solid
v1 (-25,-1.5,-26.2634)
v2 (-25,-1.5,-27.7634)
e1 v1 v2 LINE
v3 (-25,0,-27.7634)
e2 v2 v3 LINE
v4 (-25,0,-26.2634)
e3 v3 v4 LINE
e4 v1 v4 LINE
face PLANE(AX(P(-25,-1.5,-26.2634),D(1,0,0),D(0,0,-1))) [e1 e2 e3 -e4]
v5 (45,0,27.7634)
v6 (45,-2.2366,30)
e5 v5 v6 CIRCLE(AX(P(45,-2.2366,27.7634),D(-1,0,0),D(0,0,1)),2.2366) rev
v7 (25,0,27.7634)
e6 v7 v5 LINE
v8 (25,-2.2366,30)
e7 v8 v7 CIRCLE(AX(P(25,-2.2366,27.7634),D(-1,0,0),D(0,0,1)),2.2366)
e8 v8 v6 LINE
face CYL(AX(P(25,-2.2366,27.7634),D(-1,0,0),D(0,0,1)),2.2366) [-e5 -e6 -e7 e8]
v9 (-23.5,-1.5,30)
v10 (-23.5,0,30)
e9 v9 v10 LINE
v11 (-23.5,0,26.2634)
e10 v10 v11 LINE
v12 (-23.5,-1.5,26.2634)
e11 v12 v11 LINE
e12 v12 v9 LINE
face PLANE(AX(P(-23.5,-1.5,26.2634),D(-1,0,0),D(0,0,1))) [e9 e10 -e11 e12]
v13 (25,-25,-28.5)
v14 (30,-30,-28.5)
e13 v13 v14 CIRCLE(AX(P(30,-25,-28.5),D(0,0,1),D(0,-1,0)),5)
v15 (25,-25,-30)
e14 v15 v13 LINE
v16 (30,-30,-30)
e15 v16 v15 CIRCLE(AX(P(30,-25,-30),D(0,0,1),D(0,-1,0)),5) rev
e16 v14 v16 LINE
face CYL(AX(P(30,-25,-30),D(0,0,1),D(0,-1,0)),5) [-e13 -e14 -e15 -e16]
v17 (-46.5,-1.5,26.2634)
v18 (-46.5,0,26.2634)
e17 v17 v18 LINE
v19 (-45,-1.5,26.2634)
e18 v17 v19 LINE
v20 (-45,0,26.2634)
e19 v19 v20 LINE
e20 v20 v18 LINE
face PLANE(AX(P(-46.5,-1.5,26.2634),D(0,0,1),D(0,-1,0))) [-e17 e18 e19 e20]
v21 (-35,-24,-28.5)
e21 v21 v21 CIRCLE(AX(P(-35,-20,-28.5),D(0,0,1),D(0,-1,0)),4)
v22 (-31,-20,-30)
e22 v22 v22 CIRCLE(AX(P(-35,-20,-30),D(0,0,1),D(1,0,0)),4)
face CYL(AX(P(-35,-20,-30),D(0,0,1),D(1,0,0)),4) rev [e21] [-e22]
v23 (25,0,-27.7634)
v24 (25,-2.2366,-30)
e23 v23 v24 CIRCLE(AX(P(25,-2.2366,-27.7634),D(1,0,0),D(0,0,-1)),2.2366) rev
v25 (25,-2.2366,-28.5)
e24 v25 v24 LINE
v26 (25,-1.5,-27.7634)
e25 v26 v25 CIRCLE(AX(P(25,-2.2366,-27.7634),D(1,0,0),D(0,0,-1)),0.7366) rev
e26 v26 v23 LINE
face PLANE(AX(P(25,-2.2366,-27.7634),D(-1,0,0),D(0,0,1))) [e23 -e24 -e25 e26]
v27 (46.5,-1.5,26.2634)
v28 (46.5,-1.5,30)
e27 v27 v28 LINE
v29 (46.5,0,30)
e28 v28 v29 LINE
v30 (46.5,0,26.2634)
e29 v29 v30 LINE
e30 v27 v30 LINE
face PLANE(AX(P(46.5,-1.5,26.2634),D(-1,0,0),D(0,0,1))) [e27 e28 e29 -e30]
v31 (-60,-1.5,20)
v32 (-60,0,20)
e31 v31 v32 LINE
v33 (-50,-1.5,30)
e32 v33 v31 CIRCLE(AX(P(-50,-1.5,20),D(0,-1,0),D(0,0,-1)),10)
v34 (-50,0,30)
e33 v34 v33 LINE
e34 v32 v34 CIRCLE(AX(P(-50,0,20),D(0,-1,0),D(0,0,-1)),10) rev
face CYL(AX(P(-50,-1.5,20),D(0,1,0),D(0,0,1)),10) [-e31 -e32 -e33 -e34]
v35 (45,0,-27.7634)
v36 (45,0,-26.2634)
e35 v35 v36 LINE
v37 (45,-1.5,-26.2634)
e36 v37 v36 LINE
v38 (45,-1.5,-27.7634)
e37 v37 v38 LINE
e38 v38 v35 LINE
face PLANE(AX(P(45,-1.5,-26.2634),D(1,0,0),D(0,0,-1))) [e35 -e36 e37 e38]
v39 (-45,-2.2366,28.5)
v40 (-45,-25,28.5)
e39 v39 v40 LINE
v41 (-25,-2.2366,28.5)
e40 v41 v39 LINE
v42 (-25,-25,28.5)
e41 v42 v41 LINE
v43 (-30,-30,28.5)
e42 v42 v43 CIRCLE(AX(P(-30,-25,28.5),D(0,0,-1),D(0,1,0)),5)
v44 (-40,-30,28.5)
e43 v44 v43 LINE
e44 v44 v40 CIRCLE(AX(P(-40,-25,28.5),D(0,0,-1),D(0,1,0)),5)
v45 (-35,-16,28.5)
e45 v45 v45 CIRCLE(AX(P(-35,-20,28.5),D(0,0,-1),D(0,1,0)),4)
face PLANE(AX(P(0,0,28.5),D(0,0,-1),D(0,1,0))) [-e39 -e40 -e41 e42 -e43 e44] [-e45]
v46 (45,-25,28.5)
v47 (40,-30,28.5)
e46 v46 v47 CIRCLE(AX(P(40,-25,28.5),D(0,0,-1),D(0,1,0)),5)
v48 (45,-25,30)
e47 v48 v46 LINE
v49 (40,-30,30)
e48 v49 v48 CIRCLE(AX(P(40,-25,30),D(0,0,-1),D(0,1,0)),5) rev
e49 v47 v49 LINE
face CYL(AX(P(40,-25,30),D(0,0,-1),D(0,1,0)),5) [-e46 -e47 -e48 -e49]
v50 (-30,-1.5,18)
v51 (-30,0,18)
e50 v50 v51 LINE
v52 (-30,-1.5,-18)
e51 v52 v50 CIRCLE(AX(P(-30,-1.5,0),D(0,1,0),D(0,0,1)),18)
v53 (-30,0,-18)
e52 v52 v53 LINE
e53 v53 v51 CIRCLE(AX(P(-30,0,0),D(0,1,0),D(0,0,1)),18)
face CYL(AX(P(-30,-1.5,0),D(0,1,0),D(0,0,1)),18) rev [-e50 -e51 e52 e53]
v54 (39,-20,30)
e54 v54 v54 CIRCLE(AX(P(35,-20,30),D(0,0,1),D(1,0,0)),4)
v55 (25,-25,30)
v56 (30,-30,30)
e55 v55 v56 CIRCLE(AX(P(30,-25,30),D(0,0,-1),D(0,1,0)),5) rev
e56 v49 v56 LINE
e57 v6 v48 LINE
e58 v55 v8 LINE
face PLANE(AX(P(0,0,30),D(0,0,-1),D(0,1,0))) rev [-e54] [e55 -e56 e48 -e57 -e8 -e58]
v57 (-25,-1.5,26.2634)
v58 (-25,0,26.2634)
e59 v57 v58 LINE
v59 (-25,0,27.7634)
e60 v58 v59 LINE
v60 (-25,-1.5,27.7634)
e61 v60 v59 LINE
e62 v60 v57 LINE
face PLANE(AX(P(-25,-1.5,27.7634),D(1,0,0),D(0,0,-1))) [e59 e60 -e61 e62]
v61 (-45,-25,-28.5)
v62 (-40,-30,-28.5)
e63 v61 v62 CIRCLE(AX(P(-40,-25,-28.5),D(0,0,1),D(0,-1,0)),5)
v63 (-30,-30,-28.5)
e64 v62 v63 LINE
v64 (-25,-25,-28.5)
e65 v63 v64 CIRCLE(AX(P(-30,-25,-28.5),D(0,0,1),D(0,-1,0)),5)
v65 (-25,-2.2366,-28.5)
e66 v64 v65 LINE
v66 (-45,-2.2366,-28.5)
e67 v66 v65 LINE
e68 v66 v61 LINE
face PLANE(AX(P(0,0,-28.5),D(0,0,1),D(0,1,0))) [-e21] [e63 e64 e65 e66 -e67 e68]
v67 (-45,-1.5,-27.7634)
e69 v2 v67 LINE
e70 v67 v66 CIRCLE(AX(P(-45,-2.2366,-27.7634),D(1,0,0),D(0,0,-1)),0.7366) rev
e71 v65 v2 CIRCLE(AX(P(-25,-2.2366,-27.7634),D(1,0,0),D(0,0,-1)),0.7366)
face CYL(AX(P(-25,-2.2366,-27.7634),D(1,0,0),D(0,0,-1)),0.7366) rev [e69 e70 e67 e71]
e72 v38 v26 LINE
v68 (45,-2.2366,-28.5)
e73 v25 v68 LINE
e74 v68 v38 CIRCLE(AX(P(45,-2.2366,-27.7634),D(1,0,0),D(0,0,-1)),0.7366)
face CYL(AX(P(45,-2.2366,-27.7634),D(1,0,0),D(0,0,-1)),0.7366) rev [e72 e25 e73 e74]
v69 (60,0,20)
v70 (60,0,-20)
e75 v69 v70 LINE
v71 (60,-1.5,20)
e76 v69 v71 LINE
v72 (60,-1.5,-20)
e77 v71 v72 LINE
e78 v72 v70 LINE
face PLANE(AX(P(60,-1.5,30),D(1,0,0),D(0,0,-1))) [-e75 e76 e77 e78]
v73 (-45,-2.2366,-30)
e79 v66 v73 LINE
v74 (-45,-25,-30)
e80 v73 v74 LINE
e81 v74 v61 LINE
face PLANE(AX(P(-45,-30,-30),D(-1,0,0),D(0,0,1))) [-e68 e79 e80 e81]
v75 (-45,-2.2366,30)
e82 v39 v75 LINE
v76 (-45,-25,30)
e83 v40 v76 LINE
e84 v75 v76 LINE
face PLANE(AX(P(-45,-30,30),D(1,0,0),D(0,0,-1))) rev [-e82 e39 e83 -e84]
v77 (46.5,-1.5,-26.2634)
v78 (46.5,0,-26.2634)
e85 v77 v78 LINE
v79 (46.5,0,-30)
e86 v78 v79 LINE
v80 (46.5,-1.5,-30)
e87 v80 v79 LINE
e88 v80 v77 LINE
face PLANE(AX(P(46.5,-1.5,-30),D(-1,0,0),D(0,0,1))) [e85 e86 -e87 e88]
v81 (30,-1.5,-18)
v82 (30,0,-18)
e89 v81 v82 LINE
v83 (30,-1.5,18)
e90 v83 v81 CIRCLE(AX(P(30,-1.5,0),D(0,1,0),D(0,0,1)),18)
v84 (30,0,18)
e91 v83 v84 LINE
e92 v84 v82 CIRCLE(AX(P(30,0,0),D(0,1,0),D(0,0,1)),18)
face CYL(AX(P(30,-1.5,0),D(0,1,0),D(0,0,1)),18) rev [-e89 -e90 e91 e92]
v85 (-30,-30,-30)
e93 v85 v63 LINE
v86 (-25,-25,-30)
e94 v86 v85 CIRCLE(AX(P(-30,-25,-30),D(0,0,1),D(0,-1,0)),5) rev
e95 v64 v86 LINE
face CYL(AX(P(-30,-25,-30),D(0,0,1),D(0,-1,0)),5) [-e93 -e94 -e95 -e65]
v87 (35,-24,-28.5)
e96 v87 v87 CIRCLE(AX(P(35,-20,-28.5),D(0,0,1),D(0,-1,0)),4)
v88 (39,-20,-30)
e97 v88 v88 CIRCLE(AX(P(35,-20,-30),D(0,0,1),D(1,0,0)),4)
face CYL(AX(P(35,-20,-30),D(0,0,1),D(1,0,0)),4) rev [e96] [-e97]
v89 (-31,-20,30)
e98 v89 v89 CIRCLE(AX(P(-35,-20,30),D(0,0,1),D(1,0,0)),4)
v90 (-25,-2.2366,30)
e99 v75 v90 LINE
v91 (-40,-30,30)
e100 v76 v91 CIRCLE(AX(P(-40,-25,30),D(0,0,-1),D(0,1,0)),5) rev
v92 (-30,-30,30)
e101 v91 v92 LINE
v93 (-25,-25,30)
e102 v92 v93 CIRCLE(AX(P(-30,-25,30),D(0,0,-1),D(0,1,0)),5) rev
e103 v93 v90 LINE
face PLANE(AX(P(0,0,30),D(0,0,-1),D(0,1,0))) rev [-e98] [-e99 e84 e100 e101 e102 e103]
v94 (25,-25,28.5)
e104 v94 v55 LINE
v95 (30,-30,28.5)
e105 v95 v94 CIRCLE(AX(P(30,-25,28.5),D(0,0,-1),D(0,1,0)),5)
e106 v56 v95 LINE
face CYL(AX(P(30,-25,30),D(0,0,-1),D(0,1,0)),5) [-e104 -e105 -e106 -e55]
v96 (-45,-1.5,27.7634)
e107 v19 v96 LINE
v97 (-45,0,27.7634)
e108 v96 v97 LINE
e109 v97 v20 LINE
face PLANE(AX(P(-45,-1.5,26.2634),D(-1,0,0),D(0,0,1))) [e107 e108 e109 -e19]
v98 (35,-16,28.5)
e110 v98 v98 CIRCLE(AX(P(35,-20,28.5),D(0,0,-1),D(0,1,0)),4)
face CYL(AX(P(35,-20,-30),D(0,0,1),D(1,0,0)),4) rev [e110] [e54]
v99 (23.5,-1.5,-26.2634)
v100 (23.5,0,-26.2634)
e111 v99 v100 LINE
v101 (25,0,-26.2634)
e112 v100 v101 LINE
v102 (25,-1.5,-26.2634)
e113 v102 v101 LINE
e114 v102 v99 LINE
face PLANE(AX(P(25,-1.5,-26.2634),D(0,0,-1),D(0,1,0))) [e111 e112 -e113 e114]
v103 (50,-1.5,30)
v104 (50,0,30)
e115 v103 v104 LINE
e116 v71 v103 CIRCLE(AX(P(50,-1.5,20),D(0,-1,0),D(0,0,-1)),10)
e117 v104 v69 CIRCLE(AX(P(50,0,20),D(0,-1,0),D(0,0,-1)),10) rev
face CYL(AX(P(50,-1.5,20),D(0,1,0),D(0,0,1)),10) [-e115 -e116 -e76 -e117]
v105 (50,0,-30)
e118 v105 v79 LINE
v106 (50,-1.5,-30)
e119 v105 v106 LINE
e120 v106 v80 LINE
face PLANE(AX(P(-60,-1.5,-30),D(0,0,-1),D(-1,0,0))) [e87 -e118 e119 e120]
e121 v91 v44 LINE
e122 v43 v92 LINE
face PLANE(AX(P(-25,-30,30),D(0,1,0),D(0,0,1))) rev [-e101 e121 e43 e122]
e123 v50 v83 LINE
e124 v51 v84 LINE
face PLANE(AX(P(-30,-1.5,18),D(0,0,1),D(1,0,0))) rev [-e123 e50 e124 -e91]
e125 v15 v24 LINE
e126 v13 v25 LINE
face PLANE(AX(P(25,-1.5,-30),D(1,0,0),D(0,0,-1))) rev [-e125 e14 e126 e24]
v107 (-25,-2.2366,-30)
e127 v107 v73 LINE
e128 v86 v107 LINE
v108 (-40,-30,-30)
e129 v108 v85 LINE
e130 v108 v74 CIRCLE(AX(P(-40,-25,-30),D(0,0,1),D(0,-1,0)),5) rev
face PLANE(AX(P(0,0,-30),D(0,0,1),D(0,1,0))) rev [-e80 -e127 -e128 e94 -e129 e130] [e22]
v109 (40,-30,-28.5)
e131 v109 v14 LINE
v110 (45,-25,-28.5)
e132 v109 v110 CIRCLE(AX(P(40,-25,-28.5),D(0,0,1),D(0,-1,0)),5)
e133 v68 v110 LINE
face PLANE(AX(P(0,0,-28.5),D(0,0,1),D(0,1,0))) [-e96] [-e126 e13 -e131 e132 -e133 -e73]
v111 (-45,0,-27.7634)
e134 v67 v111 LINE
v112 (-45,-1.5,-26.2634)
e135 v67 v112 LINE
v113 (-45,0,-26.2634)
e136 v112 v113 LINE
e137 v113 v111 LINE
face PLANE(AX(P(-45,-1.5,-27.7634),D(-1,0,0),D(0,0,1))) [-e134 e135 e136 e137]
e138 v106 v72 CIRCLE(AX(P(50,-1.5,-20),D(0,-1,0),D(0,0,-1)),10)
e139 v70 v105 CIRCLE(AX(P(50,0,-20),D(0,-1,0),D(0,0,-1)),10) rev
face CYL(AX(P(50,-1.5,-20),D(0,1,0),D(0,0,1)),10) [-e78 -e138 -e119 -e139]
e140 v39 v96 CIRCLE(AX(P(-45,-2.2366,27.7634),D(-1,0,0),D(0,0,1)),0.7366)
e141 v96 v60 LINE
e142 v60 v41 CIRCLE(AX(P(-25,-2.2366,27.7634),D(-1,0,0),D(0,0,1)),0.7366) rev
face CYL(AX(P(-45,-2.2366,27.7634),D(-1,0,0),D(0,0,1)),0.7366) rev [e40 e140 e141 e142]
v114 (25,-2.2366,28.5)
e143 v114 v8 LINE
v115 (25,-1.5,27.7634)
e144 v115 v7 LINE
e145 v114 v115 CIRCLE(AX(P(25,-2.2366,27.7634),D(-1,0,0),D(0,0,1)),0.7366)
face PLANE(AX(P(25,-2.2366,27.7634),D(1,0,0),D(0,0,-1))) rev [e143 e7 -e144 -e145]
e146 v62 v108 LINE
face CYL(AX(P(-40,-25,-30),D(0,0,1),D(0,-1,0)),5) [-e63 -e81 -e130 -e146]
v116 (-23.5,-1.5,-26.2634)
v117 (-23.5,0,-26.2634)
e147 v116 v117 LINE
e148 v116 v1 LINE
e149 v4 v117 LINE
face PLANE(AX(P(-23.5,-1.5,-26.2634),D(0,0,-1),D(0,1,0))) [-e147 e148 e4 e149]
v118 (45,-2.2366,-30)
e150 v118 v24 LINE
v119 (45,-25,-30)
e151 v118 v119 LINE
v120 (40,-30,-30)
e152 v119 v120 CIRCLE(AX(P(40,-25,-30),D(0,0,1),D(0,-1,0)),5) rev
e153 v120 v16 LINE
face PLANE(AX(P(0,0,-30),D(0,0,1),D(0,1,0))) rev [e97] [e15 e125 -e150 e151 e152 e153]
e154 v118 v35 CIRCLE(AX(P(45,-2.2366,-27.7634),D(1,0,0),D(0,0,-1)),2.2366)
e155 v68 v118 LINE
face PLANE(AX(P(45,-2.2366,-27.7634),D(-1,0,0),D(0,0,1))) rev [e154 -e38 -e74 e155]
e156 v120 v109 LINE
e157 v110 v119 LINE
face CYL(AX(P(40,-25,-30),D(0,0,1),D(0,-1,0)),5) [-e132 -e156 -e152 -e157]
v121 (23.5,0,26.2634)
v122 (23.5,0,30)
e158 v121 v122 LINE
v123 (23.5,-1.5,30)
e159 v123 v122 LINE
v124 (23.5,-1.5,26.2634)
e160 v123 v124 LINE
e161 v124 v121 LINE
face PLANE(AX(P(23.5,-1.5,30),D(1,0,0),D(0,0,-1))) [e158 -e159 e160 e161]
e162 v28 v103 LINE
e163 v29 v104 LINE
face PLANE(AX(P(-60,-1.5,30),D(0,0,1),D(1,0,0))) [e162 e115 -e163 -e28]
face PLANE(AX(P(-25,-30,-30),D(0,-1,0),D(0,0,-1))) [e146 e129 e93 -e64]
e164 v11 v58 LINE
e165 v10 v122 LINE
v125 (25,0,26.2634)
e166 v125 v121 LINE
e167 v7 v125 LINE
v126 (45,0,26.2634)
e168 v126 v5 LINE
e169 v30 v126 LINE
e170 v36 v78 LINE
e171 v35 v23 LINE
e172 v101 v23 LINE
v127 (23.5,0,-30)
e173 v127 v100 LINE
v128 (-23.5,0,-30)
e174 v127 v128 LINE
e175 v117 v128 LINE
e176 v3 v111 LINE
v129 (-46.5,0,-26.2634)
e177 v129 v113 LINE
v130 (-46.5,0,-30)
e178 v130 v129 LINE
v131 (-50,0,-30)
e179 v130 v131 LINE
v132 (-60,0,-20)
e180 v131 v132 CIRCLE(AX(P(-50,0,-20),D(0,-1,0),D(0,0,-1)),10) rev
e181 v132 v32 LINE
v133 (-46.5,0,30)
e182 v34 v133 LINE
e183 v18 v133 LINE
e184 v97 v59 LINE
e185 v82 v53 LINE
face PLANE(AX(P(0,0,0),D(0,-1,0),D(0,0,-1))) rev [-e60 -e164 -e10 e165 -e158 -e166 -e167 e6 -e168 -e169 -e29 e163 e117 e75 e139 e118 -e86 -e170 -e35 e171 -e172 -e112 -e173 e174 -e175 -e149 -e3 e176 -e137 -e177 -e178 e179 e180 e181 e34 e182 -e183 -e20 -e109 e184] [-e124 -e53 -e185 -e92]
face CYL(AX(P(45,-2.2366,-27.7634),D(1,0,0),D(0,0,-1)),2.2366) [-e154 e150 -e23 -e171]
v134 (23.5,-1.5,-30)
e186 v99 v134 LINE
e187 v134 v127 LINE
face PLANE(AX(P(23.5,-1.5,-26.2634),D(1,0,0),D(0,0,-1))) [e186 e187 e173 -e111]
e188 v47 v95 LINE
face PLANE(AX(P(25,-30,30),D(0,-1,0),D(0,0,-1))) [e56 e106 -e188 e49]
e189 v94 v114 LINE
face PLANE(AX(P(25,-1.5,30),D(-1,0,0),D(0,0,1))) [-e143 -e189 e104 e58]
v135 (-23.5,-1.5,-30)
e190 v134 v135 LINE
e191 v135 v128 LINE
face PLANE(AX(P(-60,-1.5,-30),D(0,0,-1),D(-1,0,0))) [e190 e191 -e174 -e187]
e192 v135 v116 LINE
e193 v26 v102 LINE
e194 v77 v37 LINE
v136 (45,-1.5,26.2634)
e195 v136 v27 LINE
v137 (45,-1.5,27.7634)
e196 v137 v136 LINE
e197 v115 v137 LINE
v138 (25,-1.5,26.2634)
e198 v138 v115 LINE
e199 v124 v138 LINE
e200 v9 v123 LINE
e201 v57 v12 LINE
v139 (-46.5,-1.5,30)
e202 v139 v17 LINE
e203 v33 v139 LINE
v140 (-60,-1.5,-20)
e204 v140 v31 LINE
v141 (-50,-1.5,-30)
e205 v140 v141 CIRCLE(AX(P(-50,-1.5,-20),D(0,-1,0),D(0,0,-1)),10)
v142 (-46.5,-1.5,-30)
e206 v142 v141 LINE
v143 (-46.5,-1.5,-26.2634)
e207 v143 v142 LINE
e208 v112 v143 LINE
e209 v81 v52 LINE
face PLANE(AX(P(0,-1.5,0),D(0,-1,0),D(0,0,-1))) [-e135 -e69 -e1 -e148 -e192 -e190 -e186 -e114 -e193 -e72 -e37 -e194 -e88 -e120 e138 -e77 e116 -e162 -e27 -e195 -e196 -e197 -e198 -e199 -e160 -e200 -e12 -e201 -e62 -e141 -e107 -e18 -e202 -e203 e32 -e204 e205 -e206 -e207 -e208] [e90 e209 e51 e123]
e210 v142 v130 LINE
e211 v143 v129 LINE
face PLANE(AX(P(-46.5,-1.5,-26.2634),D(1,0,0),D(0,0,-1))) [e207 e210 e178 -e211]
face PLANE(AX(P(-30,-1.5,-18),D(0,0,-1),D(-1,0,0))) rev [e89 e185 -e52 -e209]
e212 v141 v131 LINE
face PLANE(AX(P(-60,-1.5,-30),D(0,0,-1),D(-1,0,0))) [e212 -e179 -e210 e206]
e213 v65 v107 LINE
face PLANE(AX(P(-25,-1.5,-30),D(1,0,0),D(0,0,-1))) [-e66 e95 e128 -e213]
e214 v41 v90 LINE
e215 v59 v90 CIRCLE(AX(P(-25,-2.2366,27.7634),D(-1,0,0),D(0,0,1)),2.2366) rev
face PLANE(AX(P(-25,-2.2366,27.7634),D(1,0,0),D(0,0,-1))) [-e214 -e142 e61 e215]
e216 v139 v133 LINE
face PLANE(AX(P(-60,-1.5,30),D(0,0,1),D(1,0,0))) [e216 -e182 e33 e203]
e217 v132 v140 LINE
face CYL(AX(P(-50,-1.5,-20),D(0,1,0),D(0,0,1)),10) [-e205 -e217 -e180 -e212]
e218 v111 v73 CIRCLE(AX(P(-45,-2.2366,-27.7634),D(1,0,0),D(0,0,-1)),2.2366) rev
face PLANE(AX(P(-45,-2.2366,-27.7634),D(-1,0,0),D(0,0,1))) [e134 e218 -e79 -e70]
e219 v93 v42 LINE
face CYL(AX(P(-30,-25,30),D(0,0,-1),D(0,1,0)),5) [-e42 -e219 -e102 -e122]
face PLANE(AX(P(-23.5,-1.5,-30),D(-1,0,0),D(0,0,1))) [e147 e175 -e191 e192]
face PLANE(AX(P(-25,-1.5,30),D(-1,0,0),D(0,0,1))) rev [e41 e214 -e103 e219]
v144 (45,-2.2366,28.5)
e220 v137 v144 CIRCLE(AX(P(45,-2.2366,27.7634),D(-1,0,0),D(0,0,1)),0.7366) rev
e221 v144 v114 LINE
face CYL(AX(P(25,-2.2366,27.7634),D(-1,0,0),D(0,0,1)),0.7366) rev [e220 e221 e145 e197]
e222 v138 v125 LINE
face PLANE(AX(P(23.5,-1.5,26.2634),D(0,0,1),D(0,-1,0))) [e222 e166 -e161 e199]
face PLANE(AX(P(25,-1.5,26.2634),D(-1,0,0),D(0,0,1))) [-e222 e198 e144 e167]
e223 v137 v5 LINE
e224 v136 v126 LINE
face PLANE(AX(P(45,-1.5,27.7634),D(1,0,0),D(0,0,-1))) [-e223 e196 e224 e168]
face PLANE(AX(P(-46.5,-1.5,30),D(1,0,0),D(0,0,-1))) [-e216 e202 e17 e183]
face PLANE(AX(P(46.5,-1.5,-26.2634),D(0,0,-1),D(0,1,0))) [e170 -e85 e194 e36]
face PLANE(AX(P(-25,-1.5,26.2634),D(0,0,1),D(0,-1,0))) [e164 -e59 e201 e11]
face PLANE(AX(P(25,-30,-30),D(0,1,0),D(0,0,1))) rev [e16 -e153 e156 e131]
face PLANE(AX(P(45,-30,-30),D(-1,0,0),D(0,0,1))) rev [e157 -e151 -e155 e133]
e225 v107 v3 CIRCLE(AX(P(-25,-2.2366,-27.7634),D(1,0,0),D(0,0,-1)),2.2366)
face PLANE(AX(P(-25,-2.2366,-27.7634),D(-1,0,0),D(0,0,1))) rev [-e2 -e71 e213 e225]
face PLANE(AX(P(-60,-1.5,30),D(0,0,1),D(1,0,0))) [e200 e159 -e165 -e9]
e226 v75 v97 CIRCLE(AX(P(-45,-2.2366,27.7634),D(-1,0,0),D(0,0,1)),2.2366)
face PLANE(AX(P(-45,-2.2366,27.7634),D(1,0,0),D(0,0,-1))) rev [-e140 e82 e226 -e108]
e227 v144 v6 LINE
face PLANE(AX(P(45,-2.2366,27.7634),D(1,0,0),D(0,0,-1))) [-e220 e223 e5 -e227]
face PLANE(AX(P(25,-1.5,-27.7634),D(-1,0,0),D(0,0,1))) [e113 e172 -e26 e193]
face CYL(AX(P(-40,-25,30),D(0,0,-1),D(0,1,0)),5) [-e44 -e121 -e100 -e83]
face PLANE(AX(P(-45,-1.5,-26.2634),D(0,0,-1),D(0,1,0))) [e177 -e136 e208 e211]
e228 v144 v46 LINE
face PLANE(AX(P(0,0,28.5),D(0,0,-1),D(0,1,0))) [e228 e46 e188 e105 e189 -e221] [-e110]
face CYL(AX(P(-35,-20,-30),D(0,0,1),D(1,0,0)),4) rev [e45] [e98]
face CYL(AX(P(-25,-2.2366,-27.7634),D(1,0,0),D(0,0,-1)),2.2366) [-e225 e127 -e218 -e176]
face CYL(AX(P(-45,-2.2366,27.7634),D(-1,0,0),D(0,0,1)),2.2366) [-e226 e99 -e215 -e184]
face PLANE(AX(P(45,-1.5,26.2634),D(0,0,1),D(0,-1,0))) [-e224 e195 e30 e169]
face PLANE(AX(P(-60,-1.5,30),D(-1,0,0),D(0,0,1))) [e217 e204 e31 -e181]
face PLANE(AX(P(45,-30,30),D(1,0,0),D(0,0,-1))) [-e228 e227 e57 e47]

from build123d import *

# Parameters (mm, degrees)
SKETCH1_W                     = 120
SKETCH1_H                     = 60
BASE_FLANGE1_DEPTH            = 1.5
BREAK_CORNER1_START           = -1.5
BREAK_CORNER1_DEPTH           = 1.5
CUT_EXTRUDE1_DEPTH            = 10
EDGE_FLANGE3_STRIP_W          = 7.4732
EDGE_FLANGE3_STRIP_H          = 1.5
EDGE_FLANGE3_STRIP_CUT_DEPTH  = 20
EDGE_FLANGE3_RELIEF_W         = 8.9732
EDGE_FLANGE3_RELIEF_H         = 1.5
EDGE_FLANGE3_RELIEF_CUT_DEPTH = 1.5
EDGE_FLANGE3_DEPTH            = 20
MIRROR2_COPY_1_SKETCH_W       = 7.4732
MIRROR2_COPY_1_SKETCH_H       = 1.5
MIRROR2_COPY_1_DEPTH          = 20
MIRROR2_COPY_2_SKETCH_W       = 8.9732
MIRROR2_COPY_2_SKETCH_H       = 1.5
MIRROR2_COPY_2_DEPTH          = 1.5
MIRROR2_COPY_3_DEPTH          = 20
SKETCH14_R                    = 4
CUT_EXTRUDE2_DEPTH            = 91
BREAK_CORNER2_START           = -30
BREAK_CORNER2_DEPTH           = 60


# Read off the part's stored shape, not the designer's step: Break-Corner1, Break-Corner2
# Sheet-metal steps are written as plain solids
with BuildPart() as part:
    # Sketch1 → Base-Flange1 (new body)
    with BuildSketch(Plane(origin=(0, 0, 0), x_dir=(1, 0, 0), z_dir=(0, 1, 0))):
        Rectangle(SKETCH1_W, SKETCH1_H)
    extrude(amount=-BASE_FLANGE1_DEPTH)

    # Break-Corner1 outline → Break-Corner1 (cut)
    with BuildSketch(Plane(origin=(0, 0, 0), x_dir=(1, 0, 0), z_dir=(0, 1, 0)).offset(BREAK_CORNER1_START)):
        with BuildLine():
            ThreePointArc((50, 30), (57.071067812, 27.071067812), (60, 20))
            Line((60, 20), (60, 30))
            Line((60, 30), (50, 30))
        make_face()
        with BuildLine():
            Line((60, -30), (60, -20))
            ThreePointArc((60, -20), (57.071067812, -27.071067812), (50, -30))
            Line((50, -30), (60, -30))
        make_face()
        with BuildLine():
            ThreePointArc((-60, 20), (-57.071067812, 27.071067812), (-50, 30))
            Line((-50, 30), (-60, 30))
            Line((-60, 30), (-60, 20))
        make_face()
        with BuildLine():
            Line((-60, -30), (-50, -30))
            ThreePointArc((-50, -30), (-57.071067812, -27.071067812), (-60, -20))
            Line((-60, -20), (-60, -30))
        make_face()
    extrude(amount=BREAK_CORNER1_DEPTH, mode=Mode.SUBTRACT)

    # Sketch6 → Cut-Extrude1 (cut)
    with BuildSketch(Plane(origin=(0, 0, 0), x_dir=(1, 0, 0), z_dir=(0, 1, 0))):
        with BuildLine():
            Line((-30, 18), (30, 18))
            ThreePointArc((30, 18), (48, 0), (30, -18))
            Line((30, -18), (-30, -18))
            ThreePointArc((-30, -18), (-48, 0), (-30, 18))
        make_face()
    extrude(amount=-CUT_EXTRUDE1_DEPTH, mode=Mode.SUBTRACT)

    # Edge-Flange3 strip (across the edge) → Edge-Flange3 strip cut (cut)
    with BuildSketch(Plane(origin=(-25, -1.5, 30), x_dir=(0, 0, -1), z_dir=(-1, 0, 0))):
        with Locations((-1.5, -0.75)):
            Rectangle(EDGE_FLANGE3_STRIP_W, EDGE_FLANGE3_STRIP_H)
    edge_flange3_strip_cut = extrude(amount=EDGE_FLANGE3_STRIP_CUT_DEPTH, mode=Mode.SUBTRACT)

    # Edge-Flange3 relief (on the sheet) → Edge-Flange3 relief cut (cut)
    with BuildSketch(Plane(origin=(-25, -1.5, 27.7634), x_dir=(0, 0, -1), z_dir=(0, -1, 0))):
        with Locations((-2.9866, 0.75)):
            Rectangle(EDGE_FLANGE3_RELIEF_W, EDGE_FLANGE3_RELIEF_H)
        with Locations((-2.9866, -20.75)):
            Rectangle(EDGE_FLANGE3_RELIEF_W, EDGE_FLANGE3_RELIEF_H)
    edge_flange3_relief_cut = extrude(amount=-EDGE_FLANGE3_RELIEF_CUT_DEPTH, mode=Mode.SUBTRACT)

    # Edge-Flange3 section (across the edge) → Edge-Flange3 (add)
    with BuildSketch(Plane(origin=(-25, -1.5, 30), x_dir=(0, 0, -1), z_dir=(-1, 0, 0))):
        with BuildLine():
            Line((0, 0.7366), (0, 28.5))
            Line((0, 28.5), (1.5, 28.5))
            Line((1.5, 28.5), (1.5, 0.7366))
            ThreePointArc((1.5, 0.7366), (1.715745145, 0.215745145), (2.2366, 0))
            Line((2.2366, 0), (2.2366, -1.5))
            ThreePointArc((2.2366, -1.5), (0.655084973, -0.844915027), (0, 0.7366))
        make_face()
    edge_flange3 = extrude(amount=EDGE_FLANGE3_DEPTH)

    # Mirror1: Edge-Flange3 strip cut, Edge-Flange3 relief cut, Edge-Flange3 across plane
    add(edge_flange3_strip_cut.mirror(Plane(origin=(0, 0, 0), x_dir=(0, 0, 1), z_dir=(1, 0, 0))), mode=Mode.SUBTRACT)
    add(edge_flange3_relief_cut.mirror(Plane(origin=(0, 0, 0), x_dir=(0, 0, 1), z_dir=(1, 0, 0))), mode=Mode.SUBTRACT)
    add(edge_flange3.mirror(Plane(origin=(0, 0, 0), x_dir=(0, 0, 1), z_dir=(1, 0, 0))))

    # Mirror2: Edge-Flange3 strip cut, Edge-Flange3 relief cut, Edge-Flange3 across plane
    add(edge_flange3_strip_cut.mirror(Plane.XY), mode=Mode.SUBTRACT)
    add(edge_flange3_relief_cut.mirror(Plane.XY), mode=Mode.SUBTRACT)
    add(edge_flange3.mirror(Plane.XY))

    # Mirror2 copy 1 sketch → Mirror2 copy 1 (cut)
    with BuildSketch(Plane(origin=(25, -1.5, -30), x_dir=(0, 0, 1), z_dir=(1, 0, 0))):
        with Locations((-1.5, -0.75)):
            Rectangle(MIRROR2_COPY_1_SKETCH_W, MIRROR2_COPY_1_SKETCH_H)
    extrude(amount=MIRROR2_COPY_1_DEPTH, mode=Mode.SUBTRACT)

    # Mirror2 copy 2 sketch → Mirror2 copy 2 (cut)
    with BuildSketch(Plane(origin=(25, -1.5, -27.7634), x_dir=(0, 0, 1), z_dir=(0, -1, 0))):
        with Locations((-2.9866, 0.75)):
            Rectangle(MIRROR2_COPY_2_SKETCH_W, MIRROR2_COPY_2_SKETCH_H)
        with Locations((-2.9866, -20.75)):
            Rectangle(MIRROR2_COPY_2_SKETCH_W, MIRROR2_COPY_2_SKETCH_H)
    extrude(amount=-MIRROR2_COPY_2_DEPTH, mode=Mode.SUBTRACT)

    # Mirror2 copy 3 sketch → Mirror2 copy 3 (add)
    with BuildSketch(Plane(origin=(25, -1.5, -30), x_dir=(0, 0, 1), z_dir=(1, 0, 0))):
        with BuildLine():
            Line((0, 0.7366), (0, 28.5))
            Line((0, 28.5), (1.5, 28.5))
            Line((1.5, 28.5), (1.5, 0.7366))
            ThreePointArc((1.5, 0.7366), (1.715745145, 0.215745145), (2.2366, 0))
            Line((2.2366, 0), (2.2366, -1.5))
            ThreePointArc((2.2366, -1.5), (0.655084973, -0.844915027), (0, 0.7366))
        make_face()
    extrude(amount=MIRROR2_COPY_3_DEPTH)

    # Sketch14 → Cut-Extrude2 (cut, through all)
    with BuildSketch(Plane.XY.offset(30)):
        with Locations((-35, -20)):
            Circle(SKETCH14_R)
        with Locations((35, -20)):
            Circle(SKETCH14_R)
    extrude(amount=-CUT_EXTRUDE2_DEPTH, mode=Mode.SUBTRACT)

    # Break-Corner2 outline → Break-Corner2 (cut)
    with BuildSketch(Plane.XY.offset(BREAK_CORNER2_START)):
        with BuildLine():
            Line((-25, -30), (-25, -25))
            ThreePointArc((-25, -25), (-26.464466094, -28.535533906), (-30, -30))
            Line((-30, -30), (-25, -30))
        make_face()
        with BuildLine():
            Line((-45, -30), (-40, -30))
            ThreePointArc((-40, -30), (-43.535533906, -28.535533906), (-45, -25))
            Line((-45, -25), (-45, -30))
        make_face()
        with BuildLine():
            Line((45, -30), (45, -25))
            ThreePointArc((45, -25), (43.535533906, -28.535533906), (40, -30))
            Line((40, -30), (45, -30))
        make_face()
        with BuildLine():
            Line((25, -30), (30, -30))
            ThreePointArc((30, -30), (26.464466094, -28.535533906), (25, -25))
            Line((25, -25), (25, -30))
        make_face()
    extrude(amount=BREAK_CORNER2_DEPTH, mode=Mode.SUBTRACT)


solid = part.part
